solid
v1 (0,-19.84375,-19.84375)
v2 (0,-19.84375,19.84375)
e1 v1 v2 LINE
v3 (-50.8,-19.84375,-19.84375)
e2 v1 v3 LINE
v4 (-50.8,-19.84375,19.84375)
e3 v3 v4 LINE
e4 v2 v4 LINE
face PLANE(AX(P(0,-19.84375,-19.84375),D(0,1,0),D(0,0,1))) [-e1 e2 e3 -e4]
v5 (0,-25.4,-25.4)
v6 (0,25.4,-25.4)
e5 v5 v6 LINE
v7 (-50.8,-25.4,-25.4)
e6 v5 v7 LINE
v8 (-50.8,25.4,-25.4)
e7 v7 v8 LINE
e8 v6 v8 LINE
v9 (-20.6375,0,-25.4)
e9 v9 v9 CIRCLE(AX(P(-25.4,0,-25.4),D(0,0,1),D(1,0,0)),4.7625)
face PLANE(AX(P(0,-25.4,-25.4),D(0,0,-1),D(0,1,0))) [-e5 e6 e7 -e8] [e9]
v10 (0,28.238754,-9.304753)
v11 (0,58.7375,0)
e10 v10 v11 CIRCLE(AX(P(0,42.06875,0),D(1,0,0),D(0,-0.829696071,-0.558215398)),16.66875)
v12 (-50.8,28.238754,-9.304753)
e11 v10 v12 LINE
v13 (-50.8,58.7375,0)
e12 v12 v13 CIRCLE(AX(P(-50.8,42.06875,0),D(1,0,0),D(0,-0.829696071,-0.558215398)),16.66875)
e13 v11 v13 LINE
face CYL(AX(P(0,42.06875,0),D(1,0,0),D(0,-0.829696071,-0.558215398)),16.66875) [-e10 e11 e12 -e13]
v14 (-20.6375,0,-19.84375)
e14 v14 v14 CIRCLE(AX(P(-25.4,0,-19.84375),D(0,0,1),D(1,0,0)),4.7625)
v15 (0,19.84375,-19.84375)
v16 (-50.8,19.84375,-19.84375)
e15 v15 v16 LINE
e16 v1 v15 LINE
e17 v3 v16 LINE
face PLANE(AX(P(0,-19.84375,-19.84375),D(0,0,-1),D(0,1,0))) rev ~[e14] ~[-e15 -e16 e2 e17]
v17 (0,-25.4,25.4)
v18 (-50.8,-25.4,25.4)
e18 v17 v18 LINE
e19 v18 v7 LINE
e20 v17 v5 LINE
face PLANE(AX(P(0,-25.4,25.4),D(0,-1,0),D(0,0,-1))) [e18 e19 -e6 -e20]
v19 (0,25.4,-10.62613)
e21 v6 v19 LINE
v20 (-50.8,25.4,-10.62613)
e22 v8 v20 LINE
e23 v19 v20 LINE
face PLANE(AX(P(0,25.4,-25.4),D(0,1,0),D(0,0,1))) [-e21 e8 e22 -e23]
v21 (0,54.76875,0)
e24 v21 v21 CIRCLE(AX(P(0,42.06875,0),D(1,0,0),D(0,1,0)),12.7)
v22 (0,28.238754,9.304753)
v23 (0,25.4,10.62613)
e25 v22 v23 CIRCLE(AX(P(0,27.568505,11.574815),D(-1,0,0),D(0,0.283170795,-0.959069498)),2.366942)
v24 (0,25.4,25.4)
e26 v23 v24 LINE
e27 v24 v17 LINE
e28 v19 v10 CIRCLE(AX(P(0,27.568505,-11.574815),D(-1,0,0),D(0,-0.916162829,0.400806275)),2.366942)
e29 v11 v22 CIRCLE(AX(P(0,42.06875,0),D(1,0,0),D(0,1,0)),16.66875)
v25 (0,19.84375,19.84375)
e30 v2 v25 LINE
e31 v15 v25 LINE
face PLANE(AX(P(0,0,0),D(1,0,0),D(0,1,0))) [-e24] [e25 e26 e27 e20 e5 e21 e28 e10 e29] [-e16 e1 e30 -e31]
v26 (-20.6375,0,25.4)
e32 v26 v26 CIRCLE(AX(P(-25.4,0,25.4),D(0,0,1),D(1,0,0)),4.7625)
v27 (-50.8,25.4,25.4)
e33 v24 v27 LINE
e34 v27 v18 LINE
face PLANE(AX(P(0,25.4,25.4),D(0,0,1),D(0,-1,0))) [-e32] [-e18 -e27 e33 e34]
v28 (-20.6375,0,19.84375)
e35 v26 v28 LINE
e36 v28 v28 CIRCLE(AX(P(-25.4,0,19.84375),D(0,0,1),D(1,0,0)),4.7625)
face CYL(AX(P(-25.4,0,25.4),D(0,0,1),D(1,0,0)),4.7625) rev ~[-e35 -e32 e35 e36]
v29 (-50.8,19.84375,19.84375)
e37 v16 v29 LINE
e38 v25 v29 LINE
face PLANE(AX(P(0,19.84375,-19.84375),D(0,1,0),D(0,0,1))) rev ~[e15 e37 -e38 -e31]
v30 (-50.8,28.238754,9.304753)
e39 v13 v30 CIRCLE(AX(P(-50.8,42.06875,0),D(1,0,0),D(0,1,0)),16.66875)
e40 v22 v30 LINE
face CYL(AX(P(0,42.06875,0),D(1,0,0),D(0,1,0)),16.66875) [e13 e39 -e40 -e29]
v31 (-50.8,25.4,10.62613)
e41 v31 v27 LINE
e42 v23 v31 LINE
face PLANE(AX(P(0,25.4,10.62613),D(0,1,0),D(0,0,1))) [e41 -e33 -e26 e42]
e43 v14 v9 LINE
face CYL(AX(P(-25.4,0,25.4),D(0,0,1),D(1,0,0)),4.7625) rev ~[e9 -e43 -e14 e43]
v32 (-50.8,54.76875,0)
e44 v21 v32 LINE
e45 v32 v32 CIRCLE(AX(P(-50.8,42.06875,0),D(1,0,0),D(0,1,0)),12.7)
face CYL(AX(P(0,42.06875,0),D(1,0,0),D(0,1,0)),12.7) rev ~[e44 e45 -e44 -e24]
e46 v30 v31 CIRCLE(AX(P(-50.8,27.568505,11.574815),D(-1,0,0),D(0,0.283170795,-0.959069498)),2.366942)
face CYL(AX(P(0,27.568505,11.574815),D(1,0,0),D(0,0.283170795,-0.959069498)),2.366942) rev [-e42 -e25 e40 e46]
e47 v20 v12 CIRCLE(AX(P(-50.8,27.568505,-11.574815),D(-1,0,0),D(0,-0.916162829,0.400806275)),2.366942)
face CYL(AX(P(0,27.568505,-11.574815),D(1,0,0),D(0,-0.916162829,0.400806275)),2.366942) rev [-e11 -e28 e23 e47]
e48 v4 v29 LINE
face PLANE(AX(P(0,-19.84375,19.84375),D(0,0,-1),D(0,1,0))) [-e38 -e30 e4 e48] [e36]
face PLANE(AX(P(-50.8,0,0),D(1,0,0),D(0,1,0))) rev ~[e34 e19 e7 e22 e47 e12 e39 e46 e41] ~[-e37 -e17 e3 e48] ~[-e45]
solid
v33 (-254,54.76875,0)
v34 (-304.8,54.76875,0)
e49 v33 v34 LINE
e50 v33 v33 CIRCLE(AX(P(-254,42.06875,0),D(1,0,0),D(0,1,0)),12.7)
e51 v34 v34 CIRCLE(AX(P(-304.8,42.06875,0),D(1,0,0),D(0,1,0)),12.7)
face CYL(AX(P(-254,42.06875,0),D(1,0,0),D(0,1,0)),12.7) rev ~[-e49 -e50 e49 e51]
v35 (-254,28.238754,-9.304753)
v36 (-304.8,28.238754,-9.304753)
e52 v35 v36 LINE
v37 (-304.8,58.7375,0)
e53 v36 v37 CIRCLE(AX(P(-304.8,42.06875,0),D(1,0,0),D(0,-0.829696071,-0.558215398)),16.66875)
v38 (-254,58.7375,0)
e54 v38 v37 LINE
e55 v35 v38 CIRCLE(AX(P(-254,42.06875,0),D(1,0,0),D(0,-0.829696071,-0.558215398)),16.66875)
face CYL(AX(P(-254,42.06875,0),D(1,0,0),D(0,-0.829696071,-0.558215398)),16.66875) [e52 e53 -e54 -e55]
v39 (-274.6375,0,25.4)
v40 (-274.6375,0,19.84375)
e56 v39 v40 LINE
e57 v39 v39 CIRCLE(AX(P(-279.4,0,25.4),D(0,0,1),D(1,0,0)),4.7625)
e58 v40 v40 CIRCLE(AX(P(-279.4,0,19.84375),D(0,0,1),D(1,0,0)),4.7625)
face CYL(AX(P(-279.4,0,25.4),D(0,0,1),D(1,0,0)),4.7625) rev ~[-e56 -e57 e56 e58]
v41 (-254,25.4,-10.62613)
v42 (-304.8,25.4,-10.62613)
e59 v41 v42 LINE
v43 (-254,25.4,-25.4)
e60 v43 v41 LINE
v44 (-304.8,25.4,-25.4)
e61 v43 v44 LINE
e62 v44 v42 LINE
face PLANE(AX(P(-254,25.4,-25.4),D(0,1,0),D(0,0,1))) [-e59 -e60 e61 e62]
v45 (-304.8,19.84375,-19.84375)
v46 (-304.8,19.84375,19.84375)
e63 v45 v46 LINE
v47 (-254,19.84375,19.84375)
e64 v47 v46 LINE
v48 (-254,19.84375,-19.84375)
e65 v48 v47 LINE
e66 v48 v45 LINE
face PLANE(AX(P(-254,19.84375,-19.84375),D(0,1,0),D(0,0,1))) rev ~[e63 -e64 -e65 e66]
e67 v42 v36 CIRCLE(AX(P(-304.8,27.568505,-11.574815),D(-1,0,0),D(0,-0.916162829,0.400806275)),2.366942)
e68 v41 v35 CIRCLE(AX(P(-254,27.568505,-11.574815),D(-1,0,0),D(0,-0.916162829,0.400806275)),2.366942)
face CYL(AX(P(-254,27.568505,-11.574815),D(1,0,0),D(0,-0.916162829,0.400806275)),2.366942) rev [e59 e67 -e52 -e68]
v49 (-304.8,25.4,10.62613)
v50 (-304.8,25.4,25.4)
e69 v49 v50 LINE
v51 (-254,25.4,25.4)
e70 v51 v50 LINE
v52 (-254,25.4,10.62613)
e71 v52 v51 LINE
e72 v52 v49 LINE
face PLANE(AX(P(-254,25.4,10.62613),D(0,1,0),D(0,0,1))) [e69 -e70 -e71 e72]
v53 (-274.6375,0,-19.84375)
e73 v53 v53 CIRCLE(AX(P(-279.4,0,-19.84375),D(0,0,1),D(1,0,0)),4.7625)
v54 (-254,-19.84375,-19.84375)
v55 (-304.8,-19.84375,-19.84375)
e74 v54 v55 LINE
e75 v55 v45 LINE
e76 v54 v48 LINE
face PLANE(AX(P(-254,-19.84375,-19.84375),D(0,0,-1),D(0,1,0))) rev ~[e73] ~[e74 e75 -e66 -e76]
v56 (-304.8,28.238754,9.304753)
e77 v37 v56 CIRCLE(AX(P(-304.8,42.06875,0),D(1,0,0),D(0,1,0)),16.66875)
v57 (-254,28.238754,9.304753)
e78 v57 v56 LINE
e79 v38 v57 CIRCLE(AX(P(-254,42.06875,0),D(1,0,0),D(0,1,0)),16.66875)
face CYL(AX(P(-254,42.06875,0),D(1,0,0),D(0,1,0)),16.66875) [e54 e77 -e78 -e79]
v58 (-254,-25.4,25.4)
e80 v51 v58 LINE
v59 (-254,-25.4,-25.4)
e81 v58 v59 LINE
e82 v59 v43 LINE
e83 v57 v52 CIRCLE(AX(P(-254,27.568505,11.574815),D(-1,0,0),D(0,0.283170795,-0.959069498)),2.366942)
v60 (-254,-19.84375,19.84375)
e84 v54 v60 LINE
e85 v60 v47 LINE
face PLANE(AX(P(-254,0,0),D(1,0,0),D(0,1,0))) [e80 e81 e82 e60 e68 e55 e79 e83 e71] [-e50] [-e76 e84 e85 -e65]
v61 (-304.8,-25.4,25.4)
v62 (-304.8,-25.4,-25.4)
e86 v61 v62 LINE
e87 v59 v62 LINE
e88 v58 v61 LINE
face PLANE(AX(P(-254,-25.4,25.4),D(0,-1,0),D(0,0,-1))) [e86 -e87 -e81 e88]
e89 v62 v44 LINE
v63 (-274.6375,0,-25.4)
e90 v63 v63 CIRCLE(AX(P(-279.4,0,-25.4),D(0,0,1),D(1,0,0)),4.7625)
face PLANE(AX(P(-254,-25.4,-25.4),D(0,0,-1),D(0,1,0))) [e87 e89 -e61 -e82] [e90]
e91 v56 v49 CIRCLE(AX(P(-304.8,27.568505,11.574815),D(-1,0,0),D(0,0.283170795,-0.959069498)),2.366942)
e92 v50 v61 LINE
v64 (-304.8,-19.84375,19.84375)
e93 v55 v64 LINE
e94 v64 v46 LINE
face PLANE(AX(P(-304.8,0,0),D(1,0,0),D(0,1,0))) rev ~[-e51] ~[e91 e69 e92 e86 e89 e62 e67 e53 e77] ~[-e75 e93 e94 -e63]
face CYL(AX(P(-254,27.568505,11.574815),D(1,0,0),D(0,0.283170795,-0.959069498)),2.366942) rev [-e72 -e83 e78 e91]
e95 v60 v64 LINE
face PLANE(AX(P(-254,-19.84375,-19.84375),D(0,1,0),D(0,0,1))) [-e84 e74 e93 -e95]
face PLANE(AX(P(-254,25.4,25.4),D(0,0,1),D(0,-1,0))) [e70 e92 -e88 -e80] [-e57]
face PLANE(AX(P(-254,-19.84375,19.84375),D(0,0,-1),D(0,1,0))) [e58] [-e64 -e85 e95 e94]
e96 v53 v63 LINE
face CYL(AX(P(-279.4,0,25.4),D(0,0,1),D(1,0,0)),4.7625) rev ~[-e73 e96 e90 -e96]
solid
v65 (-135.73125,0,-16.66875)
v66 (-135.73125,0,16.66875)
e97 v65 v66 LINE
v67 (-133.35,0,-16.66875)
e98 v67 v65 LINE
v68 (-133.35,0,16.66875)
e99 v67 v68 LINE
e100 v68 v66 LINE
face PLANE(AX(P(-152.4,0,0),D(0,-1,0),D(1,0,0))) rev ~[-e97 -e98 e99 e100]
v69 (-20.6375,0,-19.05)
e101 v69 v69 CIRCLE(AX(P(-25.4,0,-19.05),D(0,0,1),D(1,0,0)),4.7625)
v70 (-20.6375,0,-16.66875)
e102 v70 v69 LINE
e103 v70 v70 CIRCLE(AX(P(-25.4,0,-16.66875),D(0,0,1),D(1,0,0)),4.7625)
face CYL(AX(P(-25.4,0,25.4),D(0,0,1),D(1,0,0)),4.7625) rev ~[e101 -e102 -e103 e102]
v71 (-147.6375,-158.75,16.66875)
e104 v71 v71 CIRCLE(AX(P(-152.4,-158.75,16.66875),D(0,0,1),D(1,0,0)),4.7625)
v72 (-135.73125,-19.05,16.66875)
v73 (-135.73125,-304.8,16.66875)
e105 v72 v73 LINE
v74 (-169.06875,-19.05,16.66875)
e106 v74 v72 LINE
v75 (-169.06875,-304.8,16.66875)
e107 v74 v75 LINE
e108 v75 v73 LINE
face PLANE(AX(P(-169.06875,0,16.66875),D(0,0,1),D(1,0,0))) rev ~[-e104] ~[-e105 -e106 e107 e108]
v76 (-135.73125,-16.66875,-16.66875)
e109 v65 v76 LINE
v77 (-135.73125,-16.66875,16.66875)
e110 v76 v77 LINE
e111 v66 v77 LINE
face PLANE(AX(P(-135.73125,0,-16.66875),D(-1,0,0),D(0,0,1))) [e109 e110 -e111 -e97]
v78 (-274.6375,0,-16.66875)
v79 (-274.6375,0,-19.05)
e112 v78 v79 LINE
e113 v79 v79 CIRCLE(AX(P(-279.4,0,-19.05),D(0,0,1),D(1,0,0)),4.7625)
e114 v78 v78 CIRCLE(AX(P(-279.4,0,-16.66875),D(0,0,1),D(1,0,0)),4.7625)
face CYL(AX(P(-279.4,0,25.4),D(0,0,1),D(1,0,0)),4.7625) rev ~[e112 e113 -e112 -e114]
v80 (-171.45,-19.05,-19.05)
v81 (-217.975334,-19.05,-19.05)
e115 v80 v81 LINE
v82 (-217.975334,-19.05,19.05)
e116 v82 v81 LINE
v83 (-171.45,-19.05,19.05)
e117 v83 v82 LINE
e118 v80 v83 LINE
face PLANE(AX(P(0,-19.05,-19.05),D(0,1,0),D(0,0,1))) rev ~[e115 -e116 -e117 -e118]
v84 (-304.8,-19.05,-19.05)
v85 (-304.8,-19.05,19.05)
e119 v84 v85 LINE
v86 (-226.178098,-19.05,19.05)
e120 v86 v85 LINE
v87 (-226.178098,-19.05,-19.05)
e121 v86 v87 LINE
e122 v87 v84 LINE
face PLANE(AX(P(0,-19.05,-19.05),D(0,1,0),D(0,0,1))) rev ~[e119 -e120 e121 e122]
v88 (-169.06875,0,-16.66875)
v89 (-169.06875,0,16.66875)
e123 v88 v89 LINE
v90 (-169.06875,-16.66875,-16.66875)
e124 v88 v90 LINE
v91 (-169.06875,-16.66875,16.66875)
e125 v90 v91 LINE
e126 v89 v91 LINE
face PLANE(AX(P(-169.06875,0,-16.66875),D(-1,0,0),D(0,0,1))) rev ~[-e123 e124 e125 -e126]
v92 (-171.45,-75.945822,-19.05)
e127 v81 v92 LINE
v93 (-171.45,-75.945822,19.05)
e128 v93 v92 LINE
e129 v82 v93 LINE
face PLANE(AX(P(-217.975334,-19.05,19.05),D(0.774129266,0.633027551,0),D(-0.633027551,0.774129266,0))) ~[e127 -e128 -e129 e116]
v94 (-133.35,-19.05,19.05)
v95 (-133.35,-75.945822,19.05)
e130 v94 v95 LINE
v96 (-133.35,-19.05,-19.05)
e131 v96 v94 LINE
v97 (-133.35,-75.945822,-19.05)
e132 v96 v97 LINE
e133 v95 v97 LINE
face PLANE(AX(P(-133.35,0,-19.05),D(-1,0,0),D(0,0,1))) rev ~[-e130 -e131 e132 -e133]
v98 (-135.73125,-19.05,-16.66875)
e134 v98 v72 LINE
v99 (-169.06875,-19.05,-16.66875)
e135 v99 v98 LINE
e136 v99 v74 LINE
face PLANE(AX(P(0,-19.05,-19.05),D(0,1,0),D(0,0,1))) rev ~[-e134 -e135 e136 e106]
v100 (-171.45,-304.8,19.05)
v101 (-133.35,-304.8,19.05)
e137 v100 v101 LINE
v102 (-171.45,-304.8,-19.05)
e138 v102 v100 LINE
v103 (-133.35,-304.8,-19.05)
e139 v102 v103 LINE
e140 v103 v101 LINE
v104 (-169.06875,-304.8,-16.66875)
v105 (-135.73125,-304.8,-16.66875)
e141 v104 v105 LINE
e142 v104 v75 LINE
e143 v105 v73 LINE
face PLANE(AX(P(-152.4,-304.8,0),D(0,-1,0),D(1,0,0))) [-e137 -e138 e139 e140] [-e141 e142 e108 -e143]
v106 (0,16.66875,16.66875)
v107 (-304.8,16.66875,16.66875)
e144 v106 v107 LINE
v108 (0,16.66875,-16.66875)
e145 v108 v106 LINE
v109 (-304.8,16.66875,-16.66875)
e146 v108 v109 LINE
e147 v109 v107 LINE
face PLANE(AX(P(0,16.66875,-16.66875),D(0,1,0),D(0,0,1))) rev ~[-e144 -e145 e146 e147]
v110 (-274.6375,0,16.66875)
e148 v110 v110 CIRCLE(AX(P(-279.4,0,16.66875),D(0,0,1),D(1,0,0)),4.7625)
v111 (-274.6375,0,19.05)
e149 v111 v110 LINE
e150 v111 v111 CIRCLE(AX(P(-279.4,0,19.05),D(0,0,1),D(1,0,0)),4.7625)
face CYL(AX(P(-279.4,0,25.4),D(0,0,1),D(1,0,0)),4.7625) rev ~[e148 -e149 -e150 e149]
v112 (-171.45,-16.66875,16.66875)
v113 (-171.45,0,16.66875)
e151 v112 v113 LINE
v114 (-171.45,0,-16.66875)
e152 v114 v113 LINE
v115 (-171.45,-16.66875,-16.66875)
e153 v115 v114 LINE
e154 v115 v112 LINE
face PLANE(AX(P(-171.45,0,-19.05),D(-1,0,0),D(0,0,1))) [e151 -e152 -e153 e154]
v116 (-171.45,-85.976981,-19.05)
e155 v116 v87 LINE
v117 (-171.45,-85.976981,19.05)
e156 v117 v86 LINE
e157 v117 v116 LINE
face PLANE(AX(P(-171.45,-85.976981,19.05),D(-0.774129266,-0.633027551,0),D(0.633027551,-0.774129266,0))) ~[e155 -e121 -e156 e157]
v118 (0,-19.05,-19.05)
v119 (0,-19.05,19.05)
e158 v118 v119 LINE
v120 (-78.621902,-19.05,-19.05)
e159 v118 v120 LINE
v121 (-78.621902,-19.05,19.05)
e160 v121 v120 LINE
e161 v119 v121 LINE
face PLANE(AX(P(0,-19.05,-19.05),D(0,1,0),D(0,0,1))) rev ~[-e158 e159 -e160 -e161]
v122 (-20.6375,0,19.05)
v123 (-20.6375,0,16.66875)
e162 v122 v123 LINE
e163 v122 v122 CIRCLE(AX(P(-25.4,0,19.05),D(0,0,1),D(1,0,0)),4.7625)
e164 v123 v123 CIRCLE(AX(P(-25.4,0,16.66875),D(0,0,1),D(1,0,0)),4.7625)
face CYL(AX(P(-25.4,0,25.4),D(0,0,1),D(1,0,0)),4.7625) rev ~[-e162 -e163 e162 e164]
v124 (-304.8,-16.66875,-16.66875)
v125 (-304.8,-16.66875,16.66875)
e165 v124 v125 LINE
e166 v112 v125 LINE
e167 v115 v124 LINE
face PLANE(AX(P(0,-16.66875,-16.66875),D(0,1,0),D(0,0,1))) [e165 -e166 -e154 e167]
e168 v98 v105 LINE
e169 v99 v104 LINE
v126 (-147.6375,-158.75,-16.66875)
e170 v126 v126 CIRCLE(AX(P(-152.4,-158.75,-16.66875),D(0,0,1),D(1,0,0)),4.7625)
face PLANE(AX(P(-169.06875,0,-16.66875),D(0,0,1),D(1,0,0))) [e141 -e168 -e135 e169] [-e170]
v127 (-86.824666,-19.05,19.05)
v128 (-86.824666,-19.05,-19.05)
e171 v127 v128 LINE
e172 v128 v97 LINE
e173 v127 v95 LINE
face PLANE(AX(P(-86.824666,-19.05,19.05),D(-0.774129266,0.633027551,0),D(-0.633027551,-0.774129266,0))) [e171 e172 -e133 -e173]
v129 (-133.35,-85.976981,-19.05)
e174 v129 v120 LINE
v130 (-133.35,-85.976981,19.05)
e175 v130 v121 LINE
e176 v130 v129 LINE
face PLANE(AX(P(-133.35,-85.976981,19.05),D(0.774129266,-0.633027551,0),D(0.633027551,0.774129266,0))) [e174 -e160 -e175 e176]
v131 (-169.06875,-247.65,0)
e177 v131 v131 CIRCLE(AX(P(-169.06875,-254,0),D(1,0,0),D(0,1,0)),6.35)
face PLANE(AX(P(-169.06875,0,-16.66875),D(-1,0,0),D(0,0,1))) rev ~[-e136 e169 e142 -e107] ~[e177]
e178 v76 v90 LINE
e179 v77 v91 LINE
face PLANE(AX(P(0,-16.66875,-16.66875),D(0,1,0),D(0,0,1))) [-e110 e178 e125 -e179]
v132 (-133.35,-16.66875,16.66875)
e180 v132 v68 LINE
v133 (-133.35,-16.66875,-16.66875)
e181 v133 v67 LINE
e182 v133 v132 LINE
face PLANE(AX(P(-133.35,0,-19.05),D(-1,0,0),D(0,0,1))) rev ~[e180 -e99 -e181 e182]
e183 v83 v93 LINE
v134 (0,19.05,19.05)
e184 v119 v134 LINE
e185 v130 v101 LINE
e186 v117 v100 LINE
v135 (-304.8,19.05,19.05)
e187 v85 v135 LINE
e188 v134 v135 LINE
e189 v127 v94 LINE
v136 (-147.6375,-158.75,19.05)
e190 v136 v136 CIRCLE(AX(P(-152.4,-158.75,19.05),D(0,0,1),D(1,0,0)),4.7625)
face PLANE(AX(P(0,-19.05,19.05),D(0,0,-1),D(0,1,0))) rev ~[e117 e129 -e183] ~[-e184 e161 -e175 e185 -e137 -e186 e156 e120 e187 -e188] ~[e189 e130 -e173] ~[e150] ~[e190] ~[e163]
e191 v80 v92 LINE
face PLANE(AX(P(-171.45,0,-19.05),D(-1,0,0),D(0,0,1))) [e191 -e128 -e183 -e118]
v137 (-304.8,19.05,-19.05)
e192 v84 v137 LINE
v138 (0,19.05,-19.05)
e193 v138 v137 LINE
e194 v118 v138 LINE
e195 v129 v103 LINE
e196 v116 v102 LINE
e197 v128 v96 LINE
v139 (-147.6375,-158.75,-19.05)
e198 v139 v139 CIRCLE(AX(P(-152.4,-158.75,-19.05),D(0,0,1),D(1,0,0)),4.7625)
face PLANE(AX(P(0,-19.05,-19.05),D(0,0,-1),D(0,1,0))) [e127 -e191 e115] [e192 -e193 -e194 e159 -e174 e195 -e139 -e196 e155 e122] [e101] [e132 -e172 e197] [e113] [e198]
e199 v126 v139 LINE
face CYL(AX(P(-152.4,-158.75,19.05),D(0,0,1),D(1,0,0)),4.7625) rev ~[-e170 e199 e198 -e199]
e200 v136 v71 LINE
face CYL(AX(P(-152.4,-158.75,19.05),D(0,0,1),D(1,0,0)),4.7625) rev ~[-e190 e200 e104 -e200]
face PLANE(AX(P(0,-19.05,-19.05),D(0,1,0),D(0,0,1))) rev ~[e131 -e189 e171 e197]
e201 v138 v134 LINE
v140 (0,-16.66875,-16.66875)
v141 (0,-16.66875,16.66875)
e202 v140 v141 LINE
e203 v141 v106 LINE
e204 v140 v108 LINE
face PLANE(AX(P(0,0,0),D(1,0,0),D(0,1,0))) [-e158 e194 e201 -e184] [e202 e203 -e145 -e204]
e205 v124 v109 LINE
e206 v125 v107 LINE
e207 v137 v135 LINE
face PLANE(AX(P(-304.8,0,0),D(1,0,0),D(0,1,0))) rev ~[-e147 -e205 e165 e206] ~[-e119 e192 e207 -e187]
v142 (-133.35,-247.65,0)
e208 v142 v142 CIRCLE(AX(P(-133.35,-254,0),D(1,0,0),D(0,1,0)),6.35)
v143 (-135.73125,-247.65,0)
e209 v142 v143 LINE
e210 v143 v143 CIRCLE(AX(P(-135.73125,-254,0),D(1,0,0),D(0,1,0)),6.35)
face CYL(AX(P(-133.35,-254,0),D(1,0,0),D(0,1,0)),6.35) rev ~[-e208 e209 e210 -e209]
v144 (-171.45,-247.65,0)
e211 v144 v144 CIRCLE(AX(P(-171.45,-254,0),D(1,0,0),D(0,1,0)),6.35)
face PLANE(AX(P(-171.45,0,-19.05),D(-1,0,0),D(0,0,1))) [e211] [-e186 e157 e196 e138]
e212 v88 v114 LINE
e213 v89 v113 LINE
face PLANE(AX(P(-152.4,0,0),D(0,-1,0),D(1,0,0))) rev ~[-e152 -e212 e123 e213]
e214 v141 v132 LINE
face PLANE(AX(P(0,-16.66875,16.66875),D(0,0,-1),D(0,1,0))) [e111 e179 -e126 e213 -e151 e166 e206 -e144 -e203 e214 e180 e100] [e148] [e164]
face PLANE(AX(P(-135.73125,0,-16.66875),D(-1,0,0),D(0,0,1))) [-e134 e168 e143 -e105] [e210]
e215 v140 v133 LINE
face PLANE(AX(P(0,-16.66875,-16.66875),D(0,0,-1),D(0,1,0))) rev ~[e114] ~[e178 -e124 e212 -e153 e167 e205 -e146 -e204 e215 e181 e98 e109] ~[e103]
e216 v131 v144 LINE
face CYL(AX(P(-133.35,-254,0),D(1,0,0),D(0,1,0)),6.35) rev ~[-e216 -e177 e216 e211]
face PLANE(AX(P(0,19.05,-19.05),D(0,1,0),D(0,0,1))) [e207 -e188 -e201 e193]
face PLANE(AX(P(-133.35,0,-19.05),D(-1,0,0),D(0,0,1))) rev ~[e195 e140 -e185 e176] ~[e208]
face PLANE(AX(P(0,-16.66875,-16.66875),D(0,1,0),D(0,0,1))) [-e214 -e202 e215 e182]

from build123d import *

# Parameters (mm, degrees)
F0_W      = 38.1
F0_H      = 38.1
F0_W_2    = 33.3375
F0_H_2    = 33.3375
F1_DEPTH  = 304.8
F2_W      = 38.1
F2_H      = 38.1
F2_W_2    = 33.3375
F2_H_2    = 33.3375
F3_DEPTH  = 304.8
F4_W      = 39.6875
F4_H      = 39.6875
F4_R      = 12.7
F5_DEPTH  = 50.8
F7_R      = 4.7625
F8_DEPTH  = 50.801
F9_R      = 4.7625
F10_DEPTH = 50.801
F11_R     = 6.35
F12_DEPTH = 171.451
F15_DEPTH = 38.1
F16_R     = 4.7625
F17_DEPTH = 44.451


# Not quite as in the source:
# - a pattern or mirror of a feature is missing from the dataset's text; its kind, count and spacing are read off the source's solid
# - a feature names something its author has since deleted; it is built from what else it names


with BuildPart() as f1:
    # F0 (on Right) → F1 (new body)
    with BuildSketch(Plane.YZ):
        Rectangle(F0_W, F0_H)
        Rectangle(F0_W_2, F0_H_2, mode=Mode.SUBTRACT)
    extrude(amount=-F1_DEPTH)

    # F2 (on Front) → F3 (join)
    with BuildSketch(Plane.XZ):
        with Locations((-152.4, 0)):
            Rectangle(F2_W, F2_H)
        with Locations((-152.4, 0)):
            Rectangle(F2_W_2, F2_H_2, mode=Mode.SUBTRACT)
    extrude(amount=F3_DEPTH)


with BuildPart() as f5:
    # F4 (on Right) → F5 (new body)
    with BuildSketch(Plane.YZ):
        Polygon((25.4, 10.626129806), (25.4, 25.4), (-25.4, 25.4), (-25.4, -25.4), (25.4, -25.4), (25.4, -10.626129806), (25.4, -1.82e-08), align=None)
        Rectangle(F4_W, F4_H, mode=Mode.SUBTRACT)
        with BuildLine():
            ThreePointArc((28.2387536196, 9.3047529082), (26.5696544388, 9.428955298), (25.4, 10.626129806))
            Line((25.4, 10.626129806), (25.4, -1.82e-08))
            ThreePointArc((25.4, -1.82e-08), (26.1254758868, 4.864076183), (28.2387536196, 9.3047529082))
        make_face()
        with BuildLine():
            ThreePointArc((28.2387536196, -9.3047529082), (26.1254758921, -4.8640762004), (25.4, -1.82e-08))
            Line((25.4, -1.82e-08), (25.4, -10.626129806))
            ThreePointArc((25.4, -10.626129806), (26.5696544388, -9.428955298), (28.2387536196, -9.3047529082))
        make_face()
        with BuildLine():
            ThreePointArc((28.2387536196, 9.3047529082), (26.1254758868, 4.864076183), (25.4, -1.82e-08))
            ThreePointArc((25.4, -1.82e-08), (26.1254758921, -4.8640762004), (28.2387536196, -9.3047529082))
            ThreePointArc((28.2387536196, -9.3047529082), (46.9328261917, -15.9432741105), (58.7375, 0))
            ThreePointArc((58.7375, 0), (46.9328261917, 15.9432741105), (28.2387536196, 9.3047529082))
        make_face()
        with Locations((42.06875, 0)):
            Circle(F4_R, mode=Mode.SUBTRACT)
    extrude(amount=-F5_DEPTH)


with BuildPart() as f6_1:
    # F6: copy of F5
    add(f5.part.moved(Location((-254, 0, 0))))


with BuildPart() as f8_tool:
    # F7 (on face) → F8 (new body, through all)
    with BuildSketch(Plane.XY.offset(25.4)):
        with Locations((-25.4, 0)):
            Circle(F7_R)
    extrude(amount=-F8_DEPTH)


with BuildPart() as f1_1:
    add(f1.part)

    # F8: cut by f8_tool
    add(f8_tool.part, mode=Mode.SUBTRACT)


with BuildPart() as f5_1:
    add(f5.part)

    # F8: cut by f8_tool
    add(f8_tool.part, mode=Mode.SUBTRACT)


with BuildPart() as f10_tool:
    # F9 (on face) → F10 (new body, through all)
    with BuildSketch(Plane.XY.offset(25.4)):
        with Locations((-279.4, 0)):
            Circle(F9_R)
    extrude(amount=-F10_DEPTH)


with BuildPart() as f1_2:
    add(f1_1.part)

    # F10: cut by f10_tool
    add(f10_tool.part, mode=Mode.SUBTRACT)

    # F11 (on face) → F12 (cut, through all)
    with BuildSketch(Plane.YZ.offset(-133.35)):
        with Locations((-254, 0)):
            Circle(F11_R)
    extrude(amount=-F12_DEPTH, mode=Mode.SUBTRACT)

    # F13 (on face) → F15 (join)
    with BuildSketch(Plane.XY.offset(19.05)):
        Polygon((-78.6219015718, -19.05), (-86.8246659974, -19.05), (-133.35, -75.9458216504), (-133.35, -85.9769806266), align=None)
    f15 = extrude(amount=-F15_DEPTH)

    # F15_copies: F15 across plane
    add(f15.mirror(Plane(origin=(-152.4, 0, 0), x_dir=(0, 0, -1), z_dir=(-1, 0, 0))))

    # F16 (on face) → F17 (cut, through all)
    with BuildSketch(Plane.XY.offset(19.05)):
        with Locations((-152.4, -158.75)):
            Circle(F16_R)
    extrude(amount=-F17_DEPTH, mode=Mode.SUBTRACT)


with BuildPart() as f6_1_1:
    add(f6_1.part)

    # F10: cut by f10_tool
    add(f10_tool.part, mode=Mode.SUBTRACT)


solid = Compound([f5_1.part, f1_2.part, f6_1_1.part])
